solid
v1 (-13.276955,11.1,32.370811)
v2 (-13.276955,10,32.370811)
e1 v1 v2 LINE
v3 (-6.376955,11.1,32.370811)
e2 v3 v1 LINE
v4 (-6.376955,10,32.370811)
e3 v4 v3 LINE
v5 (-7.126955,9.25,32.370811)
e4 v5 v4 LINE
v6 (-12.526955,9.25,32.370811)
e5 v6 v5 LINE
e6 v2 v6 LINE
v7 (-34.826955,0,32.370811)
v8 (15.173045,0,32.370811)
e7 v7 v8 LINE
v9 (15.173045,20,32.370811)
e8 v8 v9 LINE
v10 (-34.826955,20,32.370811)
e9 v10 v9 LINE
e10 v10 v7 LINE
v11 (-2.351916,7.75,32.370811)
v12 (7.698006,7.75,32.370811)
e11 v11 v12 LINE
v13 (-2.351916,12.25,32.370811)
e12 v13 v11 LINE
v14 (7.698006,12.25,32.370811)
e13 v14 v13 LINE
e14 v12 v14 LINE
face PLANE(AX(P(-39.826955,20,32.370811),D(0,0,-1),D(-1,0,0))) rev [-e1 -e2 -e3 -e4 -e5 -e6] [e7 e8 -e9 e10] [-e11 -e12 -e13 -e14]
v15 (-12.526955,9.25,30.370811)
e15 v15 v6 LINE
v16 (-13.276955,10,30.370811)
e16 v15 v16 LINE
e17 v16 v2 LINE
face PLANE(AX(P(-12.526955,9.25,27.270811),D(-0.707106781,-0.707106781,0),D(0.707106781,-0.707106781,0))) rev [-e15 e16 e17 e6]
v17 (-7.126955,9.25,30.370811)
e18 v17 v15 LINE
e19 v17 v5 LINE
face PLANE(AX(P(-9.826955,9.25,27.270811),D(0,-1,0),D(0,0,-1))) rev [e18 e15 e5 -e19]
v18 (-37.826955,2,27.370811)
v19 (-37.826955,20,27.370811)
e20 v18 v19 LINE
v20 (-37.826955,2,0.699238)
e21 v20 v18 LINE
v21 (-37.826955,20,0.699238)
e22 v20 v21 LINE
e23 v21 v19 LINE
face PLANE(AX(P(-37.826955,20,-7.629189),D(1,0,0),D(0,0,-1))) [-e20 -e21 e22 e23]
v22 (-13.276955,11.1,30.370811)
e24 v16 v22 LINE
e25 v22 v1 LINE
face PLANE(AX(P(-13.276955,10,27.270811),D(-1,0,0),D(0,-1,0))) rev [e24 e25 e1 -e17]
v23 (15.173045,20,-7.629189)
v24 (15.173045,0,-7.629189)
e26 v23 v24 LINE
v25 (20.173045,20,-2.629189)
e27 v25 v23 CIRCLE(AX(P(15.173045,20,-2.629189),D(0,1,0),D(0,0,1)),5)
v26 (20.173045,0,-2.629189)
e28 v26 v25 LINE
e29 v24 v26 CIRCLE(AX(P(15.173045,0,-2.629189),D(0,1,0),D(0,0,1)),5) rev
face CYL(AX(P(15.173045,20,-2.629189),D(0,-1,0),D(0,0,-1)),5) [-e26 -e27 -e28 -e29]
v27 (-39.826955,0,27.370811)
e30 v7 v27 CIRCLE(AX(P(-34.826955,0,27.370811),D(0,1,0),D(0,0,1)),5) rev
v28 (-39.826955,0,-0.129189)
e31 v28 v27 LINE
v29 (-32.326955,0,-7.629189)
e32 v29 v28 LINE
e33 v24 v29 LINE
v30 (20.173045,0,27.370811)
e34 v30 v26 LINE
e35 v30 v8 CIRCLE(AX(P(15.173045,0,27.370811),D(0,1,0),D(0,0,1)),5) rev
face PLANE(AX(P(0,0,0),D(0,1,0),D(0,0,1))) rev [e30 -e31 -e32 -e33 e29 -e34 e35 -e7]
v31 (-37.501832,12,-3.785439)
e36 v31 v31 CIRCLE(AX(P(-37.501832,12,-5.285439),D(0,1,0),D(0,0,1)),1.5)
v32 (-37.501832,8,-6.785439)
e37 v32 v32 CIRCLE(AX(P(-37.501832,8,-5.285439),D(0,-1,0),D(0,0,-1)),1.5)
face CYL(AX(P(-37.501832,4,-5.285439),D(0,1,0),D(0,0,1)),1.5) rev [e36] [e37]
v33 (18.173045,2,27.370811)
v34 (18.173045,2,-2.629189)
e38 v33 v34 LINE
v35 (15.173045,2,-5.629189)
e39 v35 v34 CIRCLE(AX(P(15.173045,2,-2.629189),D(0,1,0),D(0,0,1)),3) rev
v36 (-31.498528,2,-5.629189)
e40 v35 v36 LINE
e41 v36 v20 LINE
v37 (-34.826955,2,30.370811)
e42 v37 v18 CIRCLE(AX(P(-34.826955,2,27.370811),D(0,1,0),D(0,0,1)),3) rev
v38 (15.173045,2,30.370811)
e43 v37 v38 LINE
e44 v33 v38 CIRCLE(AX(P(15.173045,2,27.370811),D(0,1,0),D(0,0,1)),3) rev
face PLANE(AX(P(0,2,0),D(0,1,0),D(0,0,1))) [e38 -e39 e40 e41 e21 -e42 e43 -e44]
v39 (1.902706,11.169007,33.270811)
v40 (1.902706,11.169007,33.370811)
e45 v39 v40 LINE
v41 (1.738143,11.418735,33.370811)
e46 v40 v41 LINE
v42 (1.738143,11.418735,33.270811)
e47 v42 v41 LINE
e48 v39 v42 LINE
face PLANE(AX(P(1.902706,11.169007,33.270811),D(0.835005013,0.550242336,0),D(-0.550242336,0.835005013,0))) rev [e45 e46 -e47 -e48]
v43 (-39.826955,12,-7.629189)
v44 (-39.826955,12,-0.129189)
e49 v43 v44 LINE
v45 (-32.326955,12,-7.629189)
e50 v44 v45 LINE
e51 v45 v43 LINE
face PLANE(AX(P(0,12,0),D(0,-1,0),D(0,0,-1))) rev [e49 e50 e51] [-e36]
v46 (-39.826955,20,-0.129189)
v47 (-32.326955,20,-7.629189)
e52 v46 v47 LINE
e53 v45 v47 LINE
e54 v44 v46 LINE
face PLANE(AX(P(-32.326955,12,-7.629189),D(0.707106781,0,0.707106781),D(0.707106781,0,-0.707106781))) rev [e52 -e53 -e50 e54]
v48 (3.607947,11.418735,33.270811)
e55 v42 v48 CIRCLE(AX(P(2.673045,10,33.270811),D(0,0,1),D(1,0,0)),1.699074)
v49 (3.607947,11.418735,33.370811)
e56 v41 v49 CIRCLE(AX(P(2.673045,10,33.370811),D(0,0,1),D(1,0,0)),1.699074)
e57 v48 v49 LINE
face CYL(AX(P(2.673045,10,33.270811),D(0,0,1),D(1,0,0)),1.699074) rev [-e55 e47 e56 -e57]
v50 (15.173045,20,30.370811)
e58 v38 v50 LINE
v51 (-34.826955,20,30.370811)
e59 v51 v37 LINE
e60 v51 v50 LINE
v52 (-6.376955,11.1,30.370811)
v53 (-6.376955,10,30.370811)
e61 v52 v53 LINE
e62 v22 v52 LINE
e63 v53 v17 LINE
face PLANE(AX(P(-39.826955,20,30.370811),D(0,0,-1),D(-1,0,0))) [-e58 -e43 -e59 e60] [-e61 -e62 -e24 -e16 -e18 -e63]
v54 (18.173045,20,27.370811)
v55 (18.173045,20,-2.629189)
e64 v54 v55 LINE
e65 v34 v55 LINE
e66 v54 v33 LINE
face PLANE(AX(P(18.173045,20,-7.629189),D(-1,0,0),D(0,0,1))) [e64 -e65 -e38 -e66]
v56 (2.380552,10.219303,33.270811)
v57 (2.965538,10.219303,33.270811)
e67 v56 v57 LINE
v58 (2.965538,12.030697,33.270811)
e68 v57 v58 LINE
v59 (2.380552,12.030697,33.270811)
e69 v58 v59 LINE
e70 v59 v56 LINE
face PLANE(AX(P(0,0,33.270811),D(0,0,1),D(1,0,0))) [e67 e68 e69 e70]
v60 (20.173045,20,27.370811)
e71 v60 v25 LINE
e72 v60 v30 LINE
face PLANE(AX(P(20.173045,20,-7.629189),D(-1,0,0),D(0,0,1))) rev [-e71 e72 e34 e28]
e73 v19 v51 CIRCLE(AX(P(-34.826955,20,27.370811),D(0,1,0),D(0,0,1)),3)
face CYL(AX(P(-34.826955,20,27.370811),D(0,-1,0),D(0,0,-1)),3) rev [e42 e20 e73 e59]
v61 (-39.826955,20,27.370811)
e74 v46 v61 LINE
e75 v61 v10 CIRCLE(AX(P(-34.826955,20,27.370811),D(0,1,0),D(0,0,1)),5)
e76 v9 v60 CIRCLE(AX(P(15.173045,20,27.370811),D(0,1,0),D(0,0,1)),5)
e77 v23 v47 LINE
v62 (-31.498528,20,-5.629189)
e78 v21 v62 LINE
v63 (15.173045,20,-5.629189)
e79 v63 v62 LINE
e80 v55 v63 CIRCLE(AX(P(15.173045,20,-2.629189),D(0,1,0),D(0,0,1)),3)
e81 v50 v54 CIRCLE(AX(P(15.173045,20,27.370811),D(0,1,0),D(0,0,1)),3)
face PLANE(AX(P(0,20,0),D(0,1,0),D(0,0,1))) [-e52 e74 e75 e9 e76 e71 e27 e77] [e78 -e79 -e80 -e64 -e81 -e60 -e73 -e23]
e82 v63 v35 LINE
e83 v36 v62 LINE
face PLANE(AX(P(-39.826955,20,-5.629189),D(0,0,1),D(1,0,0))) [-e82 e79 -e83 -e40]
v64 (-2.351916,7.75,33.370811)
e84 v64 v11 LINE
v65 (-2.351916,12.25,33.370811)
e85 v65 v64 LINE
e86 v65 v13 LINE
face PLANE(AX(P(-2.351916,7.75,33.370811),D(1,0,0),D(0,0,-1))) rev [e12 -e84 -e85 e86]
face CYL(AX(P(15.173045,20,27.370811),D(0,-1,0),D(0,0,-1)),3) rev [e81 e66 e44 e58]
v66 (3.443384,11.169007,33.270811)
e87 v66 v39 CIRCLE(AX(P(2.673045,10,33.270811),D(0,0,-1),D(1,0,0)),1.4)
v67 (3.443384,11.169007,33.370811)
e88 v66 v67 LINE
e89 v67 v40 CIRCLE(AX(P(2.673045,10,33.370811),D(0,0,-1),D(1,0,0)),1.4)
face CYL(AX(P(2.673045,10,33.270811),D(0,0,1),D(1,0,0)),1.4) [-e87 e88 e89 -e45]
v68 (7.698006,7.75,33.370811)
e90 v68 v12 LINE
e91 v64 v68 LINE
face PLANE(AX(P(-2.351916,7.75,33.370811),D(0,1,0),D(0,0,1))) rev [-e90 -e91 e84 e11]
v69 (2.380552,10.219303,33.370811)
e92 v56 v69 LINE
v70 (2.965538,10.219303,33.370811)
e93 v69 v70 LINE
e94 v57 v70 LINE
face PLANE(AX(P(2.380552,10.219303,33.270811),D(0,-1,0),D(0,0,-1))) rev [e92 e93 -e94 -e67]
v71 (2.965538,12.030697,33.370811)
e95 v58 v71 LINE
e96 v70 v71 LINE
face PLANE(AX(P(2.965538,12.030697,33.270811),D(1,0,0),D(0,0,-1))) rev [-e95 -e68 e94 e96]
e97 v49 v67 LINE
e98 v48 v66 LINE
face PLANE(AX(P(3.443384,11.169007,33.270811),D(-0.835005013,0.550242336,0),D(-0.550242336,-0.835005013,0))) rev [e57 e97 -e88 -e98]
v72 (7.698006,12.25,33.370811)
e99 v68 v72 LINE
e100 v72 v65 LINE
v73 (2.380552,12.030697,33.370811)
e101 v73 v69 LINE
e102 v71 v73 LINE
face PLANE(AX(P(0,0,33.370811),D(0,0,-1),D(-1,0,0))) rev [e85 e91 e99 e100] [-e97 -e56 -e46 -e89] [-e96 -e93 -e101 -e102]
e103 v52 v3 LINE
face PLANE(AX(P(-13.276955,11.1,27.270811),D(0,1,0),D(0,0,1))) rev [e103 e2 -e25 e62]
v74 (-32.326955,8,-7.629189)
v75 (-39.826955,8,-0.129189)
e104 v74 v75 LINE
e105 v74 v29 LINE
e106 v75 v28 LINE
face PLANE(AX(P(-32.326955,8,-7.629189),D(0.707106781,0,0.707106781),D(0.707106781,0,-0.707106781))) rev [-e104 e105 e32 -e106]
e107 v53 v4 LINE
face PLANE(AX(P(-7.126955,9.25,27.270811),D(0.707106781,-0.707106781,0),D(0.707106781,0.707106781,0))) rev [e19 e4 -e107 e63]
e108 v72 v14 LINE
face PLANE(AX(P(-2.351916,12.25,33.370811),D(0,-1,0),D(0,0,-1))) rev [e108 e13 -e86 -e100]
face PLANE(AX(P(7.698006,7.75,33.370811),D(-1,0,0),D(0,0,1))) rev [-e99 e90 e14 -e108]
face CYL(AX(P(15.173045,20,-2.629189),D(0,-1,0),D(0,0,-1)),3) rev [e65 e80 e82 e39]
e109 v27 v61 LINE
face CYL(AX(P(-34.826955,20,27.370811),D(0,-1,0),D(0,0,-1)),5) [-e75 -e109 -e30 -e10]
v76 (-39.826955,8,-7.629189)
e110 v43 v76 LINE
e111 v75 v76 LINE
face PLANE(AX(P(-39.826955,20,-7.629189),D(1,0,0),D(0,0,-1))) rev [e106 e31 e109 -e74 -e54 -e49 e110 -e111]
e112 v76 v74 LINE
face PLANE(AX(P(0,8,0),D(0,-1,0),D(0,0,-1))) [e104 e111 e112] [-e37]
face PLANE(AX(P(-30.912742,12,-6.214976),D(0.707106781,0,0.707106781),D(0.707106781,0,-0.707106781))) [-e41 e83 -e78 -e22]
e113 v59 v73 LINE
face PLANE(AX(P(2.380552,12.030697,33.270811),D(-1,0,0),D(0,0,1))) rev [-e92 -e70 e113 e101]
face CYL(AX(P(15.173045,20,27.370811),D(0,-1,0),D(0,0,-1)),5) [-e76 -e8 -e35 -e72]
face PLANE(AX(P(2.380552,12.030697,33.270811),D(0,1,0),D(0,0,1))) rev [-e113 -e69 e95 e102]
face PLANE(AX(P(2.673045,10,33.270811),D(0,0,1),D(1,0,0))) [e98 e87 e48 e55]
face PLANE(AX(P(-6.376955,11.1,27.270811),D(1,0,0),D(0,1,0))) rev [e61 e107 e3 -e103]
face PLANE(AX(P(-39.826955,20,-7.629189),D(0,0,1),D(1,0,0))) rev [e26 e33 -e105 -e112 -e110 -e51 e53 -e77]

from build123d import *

# Parameters (mm, degrees)
SKETCH4_W           = 60
SKETCH4_H           = 40
BOSS_EXTRUDE1_DEPTH = 20
FILLET1_R           = 5
FILLET2_R           = 5
CUT_EXTRUDE1_DEPTH  = 8
CUT_EXTRUDE2_DEPTH  = 8
SKETCH8_R           = 1.5
CUT_EXTRUDE4_DEPTH  = 8
SHELL3_START        = 2
SHELL3_DEPTH        = 18
SKETCH9_W           = 10.049922194
SKETCH9_H           = 4.5
BOSS_EXTRUDE2_DEPTH = 1
SKETCH10_W          = 0.584985694
SKETCH10_H          = 1.811393404
CUT_EXTRUDE5_DEPTH  = 0.1
CUT_EXTRUDE6_DEPTH  = 5.1


# Read off the part's stored shape, not the designer's step: Shell3
with BuildPart() as part:
    # Sketch4 → Boss-Extrude1 (new body)
    with BuildSketch(Plane(origin=(0, 0, 0), x_dir=(1, 0, 0), z_dir=(0, 1, 0))):
        with Locations((-9.826955075, -12.370810554)):
            Rectangle(SKETCH4_W, SKETCH4_H)
    extrude(amount=BOSS_EXTRUDE1_DEPTH)

    # Fillet1
    fillet1_edges = [part.edges().sort_by_distance(p)[0] for p in [
        (20.173044925, 10, 32.370810554),
    ]]
    fillet(fillet1_edges, radius=FILLET1_R)

    # Fillet2
    fillet2_edges = [part.edges().sort_by_distance(p)[0] for p in [
        (20.173044925, 10, -7.629189446),
        (-39.826955075, 10, 32.370810554),
    ]]
    fillet(fillet2_edges, radius=FILLET2_R)

    # Sketch6 → Cut-Extrude1 (cut)
    with BuildSketch(Plane(origin=(0, 20, 0), x_dir=(1, 0, 0), z_dir=(0, 1, 0))):
        Polygon((-32.326955075, 7.629189446), (-39.826955075, 0.129189446), (-39.826955075, 7.629189446), align=None)
    extrude(amount=-CUT_EXTRUDE1_DEPTH, mode=Mode.SUBTRACT)

    # Sketch7 → Cut-Extrude2 (cut)
    with BuildSketch(Plane.XZ):
        Polygon((-32.326955075, -7.629189446), (-39.826955075, -0.129189446), (-39.826955075, -7.629189446), align=None)
    extrude(amount=-CUT_EXTRUDE2_DEPTH, mode=Mode.SUBTRACT)

    # Sketch8 → Cut-Extrude4 (cut)
    with BuildSketch(Plane(origin=(0, 12, 0), x_dir=(1, 0, 0), z_dir=(0, 1, 0))):
        with Locations(Location((-37.501831714, 5.285439446, 0), (0, 0, 270))):
            Circle(SKETCH8_R)
    extrude(amount=-CUT_EXTRUDE4_DEPTH, mode=Mode.SUBTRACT)

    # Shell3 outline → Shell3 (cut)
    with BuildSketch(Plane(origin=(0, 0, 0), x_dir=(1, 0, 0), z_dir=(0, 1, 0)).offset(SHELL3_START)):
        with BuildLine():
            Line((-37.826955075, -0.699237679), (-37.826955075, -27.370810554))
            ThreePointArc((-37.826955075, -27.370810554), (-36.948275418, -29.492130897), (-34.826955075, -30.370810554))
            Line((-34.826955075, -30.370810554), (15.173044925, -30.370810554))
            ThreePointArc((15.173044925, -30.370810554), (17.294365268, -29.492130897), (18.173044925, -27.370810554))
            Line((18.173044925, -27.370810554), (18.173044925, 2.629189446))
            ThreePointArc((18.173044925, 2.629189446), (17.294365269, 4.75050979), (15.173044925, 5.629189446))
            Line((15.173044925, 5.629189446), (-31.49852795, 5.629189446))
            Line((-31.49852795, 5.629189446), (-37.826955075, -0.699237679))
        make_face()
    extrude(amount=SHELL3_DEPTH, mode=Mode.SUBTRACT)

    # Sketch9 → Boss-Extrude2 (add)
    with BuildSketch(Plane.XY.offset(32.370810554)):
        with Locations((2.673044925, 10)):
            Rectangle(SKETCH9_W, SKETCH9_H)
    extrude(amount=BOSS_EXTRUDE2_DEPTH)

    # Sketch10 → Cut-Extrude5 (cut)
    with BuildSketch(Plane.XY.offset(33.370810554)):
        with BuildLine():
            Line((1.902705655, 11.169007018), (1.738142725, 11.418734932))
            ThreePointArc((1.738142725, 11.418734932), (2.673044925, 8.300926449), (3.607947125, 11.418734932))
            Line((3.607947125, 11.418734932), (3.443384196, 11.169007018))
            ThreePointArc((3.443384196, 11.169007018), (2.673044925, 8.6), (1.902705655, 11.169007018))
        make_face()
        with Locations((2.673044925, 11.125)):
            Rectangle(SKETCH10_W, SKETCH10_H)
    extrude(amount=-CUT_EXTRUDE5_DEPTH, mode=Mode.SUBTRACT)

    # Sketch11 → Cut-Extrude6 (cut)
    with BuildSketch(Plane.XY.offset(32.370810554)):
        Polygon((-13.276955075, 10), (-13.276955075, 11.1), (-6.376955075, 11.1), (-6.376955075, 10), (-7.126955075, 9.25), (-9.826955075, 9.25), (-12.526955075, 9.25), align=None)
    extrude(amount=-CUT_EXTRUDE6_DEPTH, mode=Mode.SUBTRACT)


solid = part.part
